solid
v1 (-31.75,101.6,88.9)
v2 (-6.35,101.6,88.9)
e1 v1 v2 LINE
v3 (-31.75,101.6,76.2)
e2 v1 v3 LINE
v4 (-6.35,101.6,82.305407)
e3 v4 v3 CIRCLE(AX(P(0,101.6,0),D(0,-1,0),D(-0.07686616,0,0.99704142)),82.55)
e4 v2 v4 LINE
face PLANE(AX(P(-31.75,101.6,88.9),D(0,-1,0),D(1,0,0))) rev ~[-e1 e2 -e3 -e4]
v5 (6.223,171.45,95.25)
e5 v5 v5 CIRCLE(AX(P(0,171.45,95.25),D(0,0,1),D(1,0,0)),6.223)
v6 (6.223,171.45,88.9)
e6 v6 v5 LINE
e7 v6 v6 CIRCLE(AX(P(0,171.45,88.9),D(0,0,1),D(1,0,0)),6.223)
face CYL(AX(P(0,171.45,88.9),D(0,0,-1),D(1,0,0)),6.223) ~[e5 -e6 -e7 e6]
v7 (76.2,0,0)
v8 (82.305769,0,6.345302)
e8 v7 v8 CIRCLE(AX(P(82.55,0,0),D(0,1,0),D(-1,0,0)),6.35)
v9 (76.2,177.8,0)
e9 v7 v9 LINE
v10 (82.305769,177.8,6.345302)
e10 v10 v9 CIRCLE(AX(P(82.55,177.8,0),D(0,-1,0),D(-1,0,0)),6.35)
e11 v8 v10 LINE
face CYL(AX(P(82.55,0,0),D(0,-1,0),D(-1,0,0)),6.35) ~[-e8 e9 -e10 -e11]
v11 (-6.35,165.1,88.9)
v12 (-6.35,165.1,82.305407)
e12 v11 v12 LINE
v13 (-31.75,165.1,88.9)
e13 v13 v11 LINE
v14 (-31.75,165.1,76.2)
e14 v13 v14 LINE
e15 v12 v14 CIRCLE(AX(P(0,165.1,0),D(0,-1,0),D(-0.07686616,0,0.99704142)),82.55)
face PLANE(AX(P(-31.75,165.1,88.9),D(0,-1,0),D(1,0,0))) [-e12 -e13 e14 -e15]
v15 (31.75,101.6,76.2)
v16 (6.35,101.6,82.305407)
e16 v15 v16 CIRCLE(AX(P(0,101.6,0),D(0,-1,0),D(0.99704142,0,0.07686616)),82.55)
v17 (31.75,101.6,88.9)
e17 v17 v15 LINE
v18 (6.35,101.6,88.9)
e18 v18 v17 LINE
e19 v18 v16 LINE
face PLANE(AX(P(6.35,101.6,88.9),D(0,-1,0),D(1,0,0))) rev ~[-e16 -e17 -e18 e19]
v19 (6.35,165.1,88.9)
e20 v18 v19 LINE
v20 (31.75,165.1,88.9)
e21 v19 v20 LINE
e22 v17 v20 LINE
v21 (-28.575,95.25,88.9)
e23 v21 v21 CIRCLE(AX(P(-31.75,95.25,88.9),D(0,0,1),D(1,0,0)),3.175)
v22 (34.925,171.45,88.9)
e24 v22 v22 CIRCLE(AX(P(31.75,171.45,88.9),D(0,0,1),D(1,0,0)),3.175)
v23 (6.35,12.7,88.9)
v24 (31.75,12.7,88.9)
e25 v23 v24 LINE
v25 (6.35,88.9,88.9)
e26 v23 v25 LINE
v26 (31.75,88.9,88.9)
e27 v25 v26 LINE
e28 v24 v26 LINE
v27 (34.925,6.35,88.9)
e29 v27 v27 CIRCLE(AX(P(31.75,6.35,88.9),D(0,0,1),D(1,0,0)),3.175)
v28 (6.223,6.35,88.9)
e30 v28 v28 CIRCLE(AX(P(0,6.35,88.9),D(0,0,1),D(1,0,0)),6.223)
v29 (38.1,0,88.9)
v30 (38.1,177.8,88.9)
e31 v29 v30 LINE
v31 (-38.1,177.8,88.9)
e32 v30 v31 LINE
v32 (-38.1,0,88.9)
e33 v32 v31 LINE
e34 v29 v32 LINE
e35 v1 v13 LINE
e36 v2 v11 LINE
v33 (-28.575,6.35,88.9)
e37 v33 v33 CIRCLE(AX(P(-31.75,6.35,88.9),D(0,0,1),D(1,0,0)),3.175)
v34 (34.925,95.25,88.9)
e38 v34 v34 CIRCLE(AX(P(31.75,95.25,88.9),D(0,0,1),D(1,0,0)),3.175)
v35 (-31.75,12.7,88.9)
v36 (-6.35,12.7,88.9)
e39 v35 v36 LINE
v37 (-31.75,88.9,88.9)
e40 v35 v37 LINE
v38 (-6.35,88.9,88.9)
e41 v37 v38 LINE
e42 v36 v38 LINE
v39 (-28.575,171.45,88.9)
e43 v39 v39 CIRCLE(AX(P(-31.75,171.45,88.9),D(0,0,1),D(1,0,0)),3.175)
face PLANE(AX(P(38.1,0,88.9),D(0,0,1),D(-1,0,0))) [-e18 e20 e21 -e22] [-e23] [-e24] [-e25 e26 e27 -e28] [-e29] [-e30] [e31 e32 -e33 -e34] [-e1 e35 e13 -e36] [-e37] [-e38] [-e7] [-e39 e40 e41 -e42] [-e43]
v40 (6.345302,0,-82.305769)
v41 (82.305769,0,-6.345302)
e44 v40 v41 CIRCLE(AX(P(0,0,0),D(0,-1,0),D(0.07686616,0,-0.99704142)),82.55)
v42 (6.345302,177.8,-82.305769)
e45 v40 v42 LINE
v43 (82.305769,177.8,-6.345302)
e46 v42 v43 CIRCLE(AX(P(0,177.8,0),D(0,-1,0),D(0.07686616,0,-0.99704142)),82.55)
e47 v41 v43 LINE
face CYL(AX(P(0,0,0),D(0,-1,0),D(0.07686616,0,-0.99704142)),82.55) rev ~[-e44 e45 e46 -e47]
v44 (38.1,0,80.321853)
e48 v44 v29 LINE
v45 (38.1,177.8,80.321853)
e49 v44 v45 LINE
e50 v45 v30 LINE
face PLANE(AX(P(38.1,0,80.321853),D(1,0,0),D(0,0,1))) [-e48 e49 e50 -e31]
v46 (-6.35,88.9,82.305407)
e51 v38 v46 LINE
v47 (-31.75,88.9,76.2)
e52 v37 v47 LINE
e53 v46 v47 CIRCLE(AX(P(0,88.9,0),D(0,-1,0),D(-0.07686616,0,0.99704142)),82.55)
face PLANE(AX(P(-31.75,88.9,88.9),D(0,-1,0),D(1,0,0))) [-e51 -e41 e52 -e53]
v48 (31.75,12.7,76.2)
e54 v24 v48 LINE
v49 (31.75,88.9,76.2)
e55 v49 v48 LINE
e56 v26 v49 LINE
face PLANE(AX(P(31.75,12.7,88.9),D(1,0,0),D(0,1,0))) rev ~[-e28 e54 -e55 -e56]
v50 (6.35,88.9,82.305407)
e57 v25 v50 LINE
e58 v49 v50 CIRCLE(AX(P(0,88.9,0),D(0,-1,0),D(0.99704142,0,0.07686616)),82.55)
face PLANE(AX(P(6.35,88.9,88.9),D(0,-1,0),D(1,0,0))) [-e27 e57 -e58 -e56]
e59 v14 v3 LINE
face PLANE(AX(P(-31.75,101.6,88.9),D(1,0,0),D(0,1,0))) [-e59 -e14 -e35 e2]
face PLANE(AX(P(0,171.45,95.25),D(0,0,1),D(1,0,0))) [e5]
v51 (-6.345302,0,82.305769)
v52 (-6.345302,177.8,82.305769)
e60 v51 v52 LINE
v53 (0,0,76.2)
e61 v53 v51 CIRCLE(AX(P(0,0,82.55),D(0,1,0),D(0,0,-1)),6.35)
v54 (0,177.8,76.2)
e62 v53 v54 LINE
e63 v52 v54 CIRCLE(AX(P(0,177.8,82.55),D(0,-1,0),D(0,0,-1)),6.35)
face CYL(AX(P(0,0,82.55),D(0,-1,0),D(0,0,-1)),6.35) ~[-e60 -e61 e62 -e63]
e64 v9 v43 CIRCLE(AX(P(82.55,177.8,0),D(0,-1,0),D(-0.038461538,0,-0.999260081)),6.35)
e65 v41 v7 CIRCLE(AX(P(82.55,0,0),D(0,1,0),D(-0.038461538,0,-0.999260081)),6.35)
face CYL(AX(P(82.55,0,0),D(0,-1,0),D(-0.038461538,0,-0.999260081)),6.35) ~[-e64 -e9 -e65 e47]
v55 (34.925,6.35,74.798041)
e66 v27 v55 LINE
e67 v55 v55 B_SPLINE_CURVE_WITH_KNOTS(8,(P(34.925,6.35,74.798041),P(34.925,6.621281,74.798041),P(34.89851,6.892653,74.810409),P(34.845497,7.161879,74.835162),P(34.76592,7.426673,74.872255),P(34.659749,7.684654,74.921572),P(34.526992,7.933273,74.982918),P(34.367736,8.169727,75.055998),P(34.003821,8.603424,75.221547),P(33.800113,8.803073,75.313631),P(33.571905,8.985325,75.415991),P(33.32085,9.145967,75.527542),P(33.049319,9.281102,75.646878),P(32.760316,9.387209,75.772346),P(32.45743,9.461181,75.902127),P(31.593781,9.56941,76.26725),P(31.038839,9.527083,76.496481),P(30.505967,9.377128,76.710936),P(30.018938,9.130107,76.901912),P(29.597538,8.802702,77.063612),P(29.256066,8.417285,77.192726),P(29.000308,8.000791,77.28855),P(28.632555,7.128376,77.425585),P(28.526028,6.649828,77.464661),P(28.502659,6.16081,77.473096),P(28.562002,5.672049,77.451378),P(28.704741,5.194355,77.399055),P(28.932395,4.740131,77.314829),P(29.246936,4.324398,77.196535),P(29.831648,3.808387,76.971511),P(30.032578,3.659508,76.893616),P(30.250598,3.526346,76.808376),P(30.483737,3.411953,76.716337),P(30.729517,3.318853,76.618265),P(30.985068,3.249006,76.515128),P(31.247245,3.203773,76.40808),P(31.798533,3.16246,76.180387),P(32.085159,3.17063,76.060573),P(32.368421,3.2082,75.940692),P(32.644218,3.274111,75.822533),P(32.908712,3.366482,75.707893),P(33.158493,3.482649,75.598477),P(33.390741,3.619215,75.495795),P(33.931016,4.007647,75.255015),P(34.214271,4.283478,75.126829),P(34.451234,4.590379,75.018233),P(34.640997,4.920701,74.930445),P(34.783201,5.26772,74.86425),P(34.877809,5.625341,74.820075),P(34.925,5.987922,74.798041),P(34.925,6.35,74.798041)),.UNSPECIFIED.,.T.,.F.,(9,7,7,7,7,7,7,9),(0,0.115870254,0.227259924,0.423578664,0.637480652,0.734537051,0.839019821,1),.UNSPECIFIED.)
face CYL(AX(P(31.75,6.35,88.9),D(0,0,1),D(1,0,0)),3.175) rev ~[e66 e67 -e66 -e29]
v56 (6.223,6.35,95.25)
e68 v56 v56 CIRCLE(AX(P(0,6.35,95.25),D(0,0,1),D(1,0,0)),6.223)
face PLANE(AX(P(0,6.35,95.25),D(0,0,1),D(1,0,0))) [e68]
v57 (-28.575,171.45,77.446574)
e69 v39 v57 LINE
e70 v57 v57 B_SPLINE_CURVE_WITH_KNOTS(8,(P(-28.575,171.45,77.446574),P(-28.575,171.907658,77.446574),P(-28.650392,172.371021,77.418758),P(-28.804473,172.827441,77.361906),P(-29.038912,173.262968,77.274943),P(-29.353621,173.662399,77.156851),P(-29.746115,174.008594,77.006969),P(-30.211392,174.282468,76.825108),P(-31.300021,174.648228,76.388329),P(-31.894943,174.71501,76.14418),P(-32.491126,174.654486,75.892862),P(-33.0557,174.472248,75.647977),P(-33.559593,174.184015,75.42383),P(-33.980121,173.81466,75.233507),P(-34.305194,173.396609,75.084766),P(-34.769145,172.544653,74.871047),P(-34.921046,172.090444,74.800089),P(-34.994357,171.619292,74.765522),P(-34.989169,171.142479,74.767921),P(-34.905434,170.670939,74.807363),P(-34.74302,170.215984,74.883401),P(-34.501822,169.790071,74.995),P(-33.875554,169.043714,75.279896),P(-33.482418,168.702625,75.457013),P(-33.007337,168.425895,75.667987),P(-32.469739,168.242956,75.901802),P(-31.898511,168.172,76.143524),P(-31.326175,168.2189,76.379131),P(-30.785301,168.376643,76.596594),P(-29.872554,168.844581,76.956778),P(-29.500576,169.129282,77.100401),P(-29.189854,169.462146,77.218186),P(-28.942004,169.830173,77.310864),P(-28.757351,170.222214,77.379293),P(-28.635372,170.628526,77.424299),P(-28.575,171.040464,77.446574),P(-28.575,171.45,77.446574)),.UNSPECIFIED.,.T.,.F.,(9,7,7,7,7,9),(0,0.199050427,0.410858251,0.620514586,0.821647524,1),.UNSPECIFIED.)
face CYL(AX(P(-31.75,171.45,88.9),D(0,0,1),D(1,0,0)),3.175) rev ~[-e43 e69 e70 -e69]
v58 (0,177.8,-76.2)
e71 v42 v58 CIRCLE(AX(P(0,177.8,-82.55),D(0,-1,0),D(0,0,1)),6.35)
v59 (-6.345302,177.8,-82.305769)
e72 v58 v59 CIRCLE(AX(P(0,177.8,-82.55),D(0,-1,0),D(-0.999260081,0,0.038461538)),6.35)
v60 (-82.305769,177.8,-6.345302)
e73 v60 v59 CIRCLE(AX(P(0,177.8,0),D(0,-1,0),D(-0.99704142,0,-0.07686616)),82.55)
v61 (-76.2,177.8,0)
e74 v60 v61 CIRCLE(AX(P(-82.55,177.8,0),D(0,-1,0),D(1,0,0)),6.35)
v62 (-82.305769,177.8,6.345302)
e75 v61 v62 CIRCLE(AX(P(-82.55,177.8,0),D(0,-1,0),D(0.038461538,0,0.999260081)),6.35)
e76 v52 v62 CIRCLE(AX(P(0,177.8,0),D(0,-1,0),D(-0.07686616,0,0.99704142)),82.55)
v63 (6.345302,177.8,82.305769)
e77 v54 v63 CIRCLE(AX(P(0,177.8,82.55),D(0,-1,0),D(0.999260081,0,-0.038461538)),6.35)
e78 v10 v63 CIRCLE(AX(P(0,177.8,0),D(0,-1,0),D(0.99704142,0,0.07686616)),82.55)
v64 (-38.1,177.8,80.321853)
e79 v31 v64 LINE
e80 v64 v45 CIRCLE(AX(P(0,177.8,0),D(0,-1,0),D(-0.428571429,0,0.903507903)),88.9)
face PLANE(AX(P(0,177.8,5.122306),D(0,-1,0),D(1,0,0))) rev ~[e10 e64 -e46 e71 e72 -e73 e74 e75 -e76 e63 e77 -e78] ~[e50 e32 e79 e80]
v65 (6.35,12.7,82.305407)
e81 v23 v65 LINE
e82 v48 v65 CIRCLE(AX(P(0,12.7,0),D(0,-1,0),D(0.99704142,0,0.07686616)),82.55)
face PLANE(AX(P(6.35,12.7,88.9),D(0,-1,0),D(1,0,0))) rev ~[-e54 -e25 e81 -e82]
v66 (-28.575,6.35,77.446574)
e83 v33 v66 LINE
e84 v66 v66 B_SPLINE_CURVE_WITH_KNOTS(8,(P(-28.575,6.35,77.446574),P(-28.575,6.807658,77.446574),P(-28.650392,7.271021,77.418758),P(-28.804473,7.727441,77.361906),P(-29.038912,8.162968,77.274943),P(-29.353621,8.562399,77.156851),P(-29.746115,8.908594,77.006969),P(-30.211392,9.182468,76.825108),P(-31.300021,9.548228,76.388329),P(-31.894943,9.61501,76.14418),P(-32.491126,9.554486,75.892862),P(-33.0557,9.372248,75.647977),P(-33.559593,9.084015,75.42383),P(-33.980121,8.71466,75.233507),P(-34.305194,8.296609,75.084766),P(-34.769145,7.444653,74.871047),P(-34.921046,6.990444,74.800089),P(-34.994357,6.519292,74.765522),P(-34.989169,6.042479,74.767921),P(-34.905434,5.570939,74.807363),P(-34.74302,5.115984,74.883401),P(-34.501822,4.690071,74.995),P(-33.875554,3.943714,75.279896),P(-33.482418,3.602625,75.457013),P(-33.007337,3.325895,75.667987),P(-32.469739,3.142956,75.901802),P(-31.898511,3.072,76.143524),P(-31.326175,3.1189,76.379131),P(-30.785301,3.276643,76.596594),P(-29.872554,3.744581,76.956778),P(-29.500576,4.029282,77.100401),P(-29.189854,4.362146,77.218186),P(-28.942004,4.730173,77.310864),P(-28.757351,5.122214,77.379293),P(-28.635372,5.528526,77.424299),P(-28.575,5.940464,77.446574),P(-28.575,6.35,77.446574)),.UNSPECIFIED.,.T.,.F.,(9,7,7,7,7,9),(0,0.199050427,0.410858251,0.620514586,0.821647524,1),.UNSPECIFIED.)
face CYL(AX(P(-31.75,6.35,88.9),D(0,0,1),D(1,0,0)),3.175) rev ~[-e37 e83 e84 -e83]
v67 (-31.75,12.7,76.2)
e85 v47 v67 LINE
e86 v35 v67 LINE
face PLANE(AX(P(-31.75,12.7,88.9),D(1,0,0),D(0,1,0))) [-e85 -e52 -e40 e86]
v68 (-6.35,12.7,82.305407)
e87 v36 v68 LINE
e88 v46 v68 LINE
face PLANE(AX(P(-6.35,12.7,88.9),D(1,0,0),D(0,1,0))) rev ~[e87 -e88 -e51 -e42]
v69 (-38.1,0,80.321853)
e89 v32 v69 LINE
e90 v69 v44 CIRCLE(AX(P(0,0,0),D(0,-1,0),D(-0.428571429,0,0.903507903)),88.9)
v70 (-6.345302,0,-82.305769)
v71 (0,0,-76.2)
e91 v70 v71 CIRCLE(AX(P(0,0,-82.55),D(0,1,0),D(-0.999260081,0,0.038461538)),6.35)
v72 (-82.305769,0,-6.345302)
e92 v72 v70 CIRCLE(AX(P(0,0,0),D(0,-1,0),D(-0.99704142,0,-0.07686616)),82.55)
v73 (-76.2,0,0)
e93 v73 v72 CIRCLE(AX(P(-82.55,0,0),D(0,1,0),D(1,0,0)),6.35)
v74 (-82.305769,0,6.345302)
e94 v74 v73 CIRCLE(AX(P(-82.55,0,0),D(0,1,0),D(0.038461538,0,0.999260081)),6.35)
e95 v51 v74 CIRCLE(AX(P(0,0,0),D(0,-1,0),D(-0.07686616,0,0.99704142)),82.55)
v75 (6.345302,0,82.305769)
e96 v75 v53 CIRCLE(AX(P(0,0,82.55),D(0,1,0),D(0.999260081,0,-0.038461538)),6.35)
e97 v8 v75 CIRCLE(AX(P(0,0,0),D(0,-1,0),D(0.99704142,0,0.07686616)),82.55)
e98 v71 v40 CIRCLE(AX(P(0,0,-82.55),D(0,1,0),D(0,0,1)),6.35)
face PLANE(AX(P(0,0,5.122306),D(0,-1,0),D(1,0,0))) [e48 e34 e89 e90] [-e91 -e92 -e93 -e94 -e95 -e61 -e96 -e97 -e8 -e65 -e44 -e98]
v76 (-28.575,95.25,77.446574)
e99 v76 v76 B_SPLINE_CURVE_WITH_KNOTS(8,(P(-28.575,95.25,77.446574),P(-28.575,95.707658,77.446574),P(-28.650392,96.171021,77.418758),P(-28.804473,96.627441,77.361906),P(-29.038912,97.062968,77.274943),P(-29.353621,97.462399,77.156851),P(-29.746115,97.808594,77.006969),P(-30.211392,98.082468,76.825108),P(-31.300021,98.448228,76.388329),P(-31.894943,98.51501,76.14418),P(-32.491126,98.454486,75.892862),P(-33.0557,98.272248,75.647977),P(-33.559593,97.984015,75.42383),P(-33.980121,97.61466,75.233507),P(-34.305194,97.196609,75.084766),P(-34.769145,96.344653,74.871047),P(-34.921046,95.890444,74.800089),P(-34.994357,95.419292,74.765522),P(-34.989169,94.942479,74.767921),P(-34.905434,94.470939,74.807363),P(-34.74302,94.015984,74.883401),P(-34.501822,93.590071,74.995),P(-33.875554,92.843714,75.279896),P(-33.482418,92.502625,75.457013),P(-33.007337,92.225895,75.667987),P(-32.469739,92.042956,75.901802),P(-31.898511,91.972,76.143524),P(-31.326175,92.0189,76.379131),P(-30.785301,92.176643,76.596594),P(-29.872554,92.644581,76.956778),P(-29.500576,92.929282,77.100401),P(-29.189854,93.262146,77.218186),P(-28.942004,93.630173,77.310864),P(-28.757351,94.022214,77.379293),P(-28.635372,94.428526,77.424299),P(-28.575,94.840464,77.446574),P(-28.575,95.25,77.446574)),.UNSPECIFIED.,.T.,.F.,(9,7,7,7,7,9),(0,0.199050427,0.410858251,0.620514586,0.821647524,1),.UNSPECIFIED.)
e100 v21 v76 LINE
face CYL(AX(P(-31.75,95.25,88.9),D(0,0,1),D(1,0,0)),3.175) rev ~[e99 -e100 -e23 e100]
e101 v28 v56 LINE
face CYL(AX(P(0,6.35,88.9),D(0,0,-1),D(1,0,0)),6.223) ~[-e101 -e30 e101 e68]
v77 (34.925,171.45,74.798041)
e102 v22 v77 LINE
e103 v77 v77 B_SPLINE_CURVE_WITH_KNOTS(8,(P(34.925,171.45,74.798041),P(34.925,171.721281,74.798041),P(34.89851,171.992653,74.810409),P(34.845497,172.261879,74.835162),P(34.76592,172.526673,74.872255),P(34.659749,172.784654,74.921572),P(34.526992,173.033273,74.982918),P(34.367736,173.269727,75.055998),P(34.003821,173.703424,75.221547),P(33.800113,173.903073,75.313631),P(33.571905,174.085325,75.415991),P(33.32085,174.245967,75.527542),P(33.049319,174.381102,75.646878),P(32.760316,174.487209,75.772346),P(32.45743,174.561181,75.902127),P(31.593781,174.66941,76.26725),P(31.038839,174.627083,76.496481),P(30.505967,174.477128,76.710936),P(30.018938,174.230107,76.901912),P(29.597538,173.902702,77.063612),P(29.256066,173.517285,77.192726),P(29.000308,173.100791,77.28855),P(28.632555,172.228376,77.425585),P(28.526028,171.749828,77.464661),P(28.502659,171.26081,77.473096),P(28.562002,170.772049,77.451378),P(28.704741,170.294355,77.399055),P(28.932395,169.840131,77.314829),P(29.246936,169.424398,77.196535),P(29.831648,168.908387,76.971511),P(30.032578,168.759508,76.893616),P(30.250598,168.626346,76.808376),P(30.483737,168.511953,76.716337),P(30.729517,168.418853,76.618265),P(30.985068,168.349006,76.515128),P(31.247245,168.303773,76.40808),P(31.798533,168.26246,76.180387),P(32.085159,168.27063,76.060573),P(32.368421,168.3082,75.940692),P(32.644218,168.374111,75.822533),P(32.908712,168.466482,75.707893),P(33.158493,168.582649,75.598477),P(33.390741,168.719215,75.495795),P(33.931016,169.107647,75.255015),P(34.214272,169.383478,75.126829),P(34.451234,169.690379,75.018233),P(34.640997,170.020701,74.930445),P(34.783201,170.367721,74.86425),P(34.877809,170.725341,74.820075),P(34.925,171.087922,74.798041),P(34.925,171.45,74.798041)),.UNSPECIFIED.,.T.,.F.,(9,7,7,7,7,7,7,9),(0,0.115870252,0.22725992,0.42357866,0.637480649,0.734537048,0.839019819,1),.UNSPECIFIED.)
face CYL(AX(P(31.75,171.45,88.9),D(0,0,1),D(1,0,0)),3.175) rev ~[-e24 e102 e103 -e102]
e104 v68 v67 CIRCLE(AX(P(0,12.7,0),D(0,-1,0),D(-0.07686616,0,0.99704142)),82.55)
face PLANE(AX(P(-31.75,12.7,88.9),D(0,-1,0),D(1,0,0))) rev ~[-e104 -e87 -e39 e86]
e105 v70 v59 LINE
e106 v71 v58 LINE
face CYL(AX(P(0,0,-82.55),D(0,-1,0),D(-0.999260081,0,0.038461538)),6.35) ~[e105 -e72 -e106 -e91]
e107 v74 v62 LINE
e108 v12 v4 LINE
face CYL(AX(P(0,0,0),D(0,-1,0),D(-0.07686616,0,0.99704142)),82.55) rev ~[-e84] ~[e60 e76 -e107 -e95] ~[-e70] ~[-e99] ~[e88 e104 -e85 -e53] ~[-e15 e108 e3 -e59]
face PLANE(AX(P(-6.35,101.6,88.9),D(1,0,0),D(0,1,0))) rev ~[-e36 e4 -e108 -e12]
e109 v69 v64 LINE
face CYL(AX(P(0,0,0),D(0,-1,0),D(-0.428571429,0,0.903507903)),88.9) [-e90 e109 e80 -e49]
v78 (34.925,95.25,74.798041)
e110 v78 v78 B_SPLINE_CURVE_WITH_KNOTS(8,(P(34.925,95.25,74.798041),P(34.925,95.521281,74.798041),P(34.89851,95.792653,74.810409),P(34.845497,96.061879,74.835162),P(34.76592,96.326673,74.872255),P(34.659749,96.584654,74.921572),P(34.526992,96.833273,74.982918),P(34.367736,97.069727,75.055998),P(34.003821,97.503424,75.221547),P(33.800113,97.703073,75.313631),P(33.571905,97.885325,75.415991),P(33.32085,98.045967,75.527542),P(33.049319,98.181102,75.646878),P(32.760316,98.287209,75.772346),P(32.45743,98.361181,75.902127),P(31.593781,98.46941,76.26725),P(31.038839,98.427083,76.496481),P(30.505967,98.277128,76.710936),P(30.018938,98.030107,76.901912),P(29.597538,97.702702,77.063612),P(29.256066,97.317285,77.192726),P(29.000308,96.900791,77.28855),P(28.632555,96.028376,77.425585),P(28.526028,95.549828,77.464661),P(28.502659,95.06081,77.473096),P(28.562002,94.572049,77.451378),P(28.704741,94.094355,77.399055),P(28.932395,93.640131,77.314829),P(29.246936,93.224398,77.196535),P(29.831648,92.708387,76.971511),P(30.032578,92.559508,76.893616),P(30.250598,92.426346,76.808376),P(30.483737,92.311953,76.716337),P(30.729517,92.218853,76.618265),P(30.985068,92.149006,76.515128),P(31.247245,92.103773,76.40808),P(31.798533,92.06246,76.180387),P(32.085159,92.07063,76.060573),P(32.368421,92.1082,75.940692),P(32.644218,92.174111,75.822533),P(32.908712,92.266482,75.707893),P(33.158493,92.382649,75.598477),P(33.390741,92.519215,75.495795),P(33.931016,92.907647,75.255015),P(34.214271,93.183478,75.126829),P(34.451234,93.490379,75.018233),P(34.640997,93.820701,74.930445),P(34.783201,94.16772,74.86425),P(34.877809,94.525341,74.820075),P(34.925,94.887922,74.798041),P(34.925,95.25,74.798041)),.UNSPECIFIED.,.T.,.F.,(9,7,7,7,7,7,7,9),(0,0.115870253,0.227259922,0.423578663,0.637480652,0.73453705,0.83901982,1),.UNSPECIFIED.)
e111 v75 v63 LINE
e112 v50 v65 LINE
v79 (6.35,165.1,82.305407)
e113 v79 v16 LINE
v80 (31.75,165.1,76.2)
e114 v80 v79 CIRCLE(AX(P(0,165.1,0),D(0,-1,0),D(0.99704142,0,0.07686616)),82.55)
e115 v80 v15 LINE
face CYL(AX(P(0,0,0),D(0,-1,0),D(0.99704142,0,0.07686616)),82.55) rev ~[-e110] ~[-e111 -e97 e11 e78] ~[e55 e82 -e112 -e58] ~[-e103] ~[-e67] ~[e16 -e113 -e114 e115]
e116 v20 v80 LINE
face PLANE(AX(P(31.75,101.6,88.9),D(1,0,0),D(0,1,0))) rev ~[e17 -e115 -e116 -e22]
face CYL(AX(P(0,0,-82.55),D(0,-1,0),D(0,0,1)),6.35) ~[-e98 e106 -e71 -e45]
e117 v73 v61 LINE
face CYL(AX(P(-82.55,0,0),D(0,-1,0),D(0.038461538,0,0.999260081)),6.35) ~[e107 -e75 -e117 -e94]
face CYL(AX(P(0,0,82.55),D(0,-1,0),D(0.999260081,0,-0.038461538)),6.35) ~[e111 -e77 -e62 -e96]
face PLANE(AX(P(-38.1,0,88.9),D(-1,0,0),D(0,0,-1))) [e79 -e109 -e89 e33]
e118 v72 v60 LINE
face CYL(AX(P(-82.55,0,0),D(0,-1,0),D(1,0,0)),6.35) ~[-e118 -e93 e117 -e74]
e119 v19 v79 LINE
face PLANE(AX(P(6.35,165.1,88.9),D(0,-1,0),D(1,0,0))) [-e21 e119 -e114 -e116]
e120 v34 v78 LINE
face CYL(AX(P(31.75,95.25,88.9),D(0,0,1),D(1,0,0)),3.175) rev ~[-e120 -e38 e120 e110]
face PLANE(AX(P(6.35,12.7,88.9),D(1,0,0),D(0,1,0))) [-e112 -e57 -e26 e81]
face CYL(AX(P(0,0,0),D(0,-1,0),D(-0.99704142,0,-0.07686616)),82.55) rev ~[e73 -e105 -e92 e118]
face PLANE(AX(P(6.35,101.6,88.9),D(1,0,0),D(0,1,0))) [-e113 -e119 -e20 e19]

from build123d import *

# Parameters (mm, degrees)
F1_DEPTH = 177.8
F4_DEPTH = 177.801
F5_W     = 25.4
F5_H     = 76.2
F5_H_2   = 63.5
F6_DEPTH = 25.4
F7_R     = 3.175
F8_DEPTH = 25.4
F7_R_2   = 6.223
F9_DEPTH = 6.35


# Not quite as in the source:
# - a feature names something its author has since deleted; it is built from what else it names


with BuildPart() as f1:
    # F0 (on Front) → F1 (new body)
    with BuildSketch(Plane.XZ):
        with BuildLine():
            ThreePointArc((-38.1, 80.3218525683), (-47.519048812, -75.1342132454), (88.9, 0))
            ThreePointArc((88.9, 0), (75.1342132454, 47.519048812), (38.1, 80.3218525683))
            ThreePointArc((38.1, 80.3218525683), (19.5268700344, 86.7289533354), (0, 88.9))
            ThreePointArc((0, 88.9), (-19.5268700344, 86.7289533354), (-38.1, 80.3218525683))
        make_face()
        with BuildLine():
            ThreePointArc((0, 88.9), (19.5268700344, 86.7289533354), (38.1, 80.3218525683))
            Line((38.1, 80.3218525683), (38.1, 88.9))
            Line((38.1, 88.9), (0, 88.9))
        make_face()
        with BuildLine():
            Line((-38.1, 88.9), (-38.1, 80.3218525683))
            ThreePointArc((-38.1, 80.3218525683), (-19.5268700344, 86.7289533354), (0, 88.9))
            Line((0, 88.9), (-38.1, 88.9))
        make_face()
    extrude(amount=-F1_DEPTH)

    # F3 (on face) → F4 (cut, through all)
    with BuildSketch(Plane.XZ):
        with BuildLine():
            Line((-76.2, 0), (0, 0))
            Line((0, 0), (0, 76.2))
            ThreePointArc((0, 76.2), (-4.4029328075, 77.974338005), (-6.3453015162, 82.3057692308))
            ThreePointArc((-6.3453015162, 82.3057692308), (-58.3716647869, 58.3716647869), (-82.3057692308, 6.3453015162))
            ThreePointArc((-82.3057692308, 6.3453015162), (-77.974338005, 4.4029328075), (-76.2, 0))
        make_face()
        with BuildLine():
            Line((0, -76.2), (0, 0))
            Line((0, 0), (-76.2, 0))
            ThreePointArc((-76.2, 0), (-77.974338005, -4.4029328075), (-82.3057692308, -6.3453015162))
            ThreePointArc((-82.3057692308, -6.3453015162), (-58.3716647869, -58.3716647869), (-6.3453015162, -82.3057692308))
            ThreePointArc((-6.3453015162, -82.3057692308), (-4.4029328075, -77.974338005), (0, -76.2))
        make_face()
        with BuildLine():
            Line((0, 76.2), (0, 0))
            Line((0, 0), (76.2, 0))
            ThreePointArc((76.2, 0), (77.974338005, 4.4029328075), (82.3057692308, 6.3453015162))
            ThreePointArc((82.3057692308, 6.3453015162), (58.3716647869, 58.3716647869), (6.3453015162, 82.3057692308))
            ThreePointArc((6.3453015162, 82.3057692308), (4.4029328075, 77.974338005), (0, 76.2))
        make_face()
        with BuildLine():
            Line((76.2, 0), (0, 0))
            Line((0, 0), (0, -76.2))
            ThreePointArc((0, -76.2), (4.4029328075, -77.974338005), (6.3453015162, -82.3057692308))
            ThreePointArc((6.3453015162, -82.3057692308), (58.3716647869, -58.3716647869), (82.3057692308, -6.3453015162))
            ThreePointArc((82.3057692308, -6.3453015162), (77.974338005, -4.4029328075), (76.2, 0))
        make_face()
    extrude(amount=-F4_DEPTH, mode=Mode.SUBTRACT)

    # F5 (on face) → F6 (cut)
    with BuildSketch(Plane.XY.offset(88.9)):
        with Locations((-19.05, 50.8)):
            Rectangle(F5_W, F5_H)
        with Locations((19.05, 50.8)):
            Rectangle(F5_W, F5_H)
        with Locations((19.05, 133.35)):
            Rectangle(F5_W, F5_H_2)
        with Locations((-19.05, 133.35)):
            Rectangle(F5_W, F5_H_2)
    extrude(amount=-F6_DEPTH, mode=Mode.SUBTRACT)

    # F7 (on face) → F8 (cut)
    with BuildSketch(Plane.XY.offset(88.9)):
        with Locations((-31.75, 95.25)):
            Circle(F7_R)
        with Locations((-31.75, 171.45)):
            Circle(F7_R)
        with Locations((31.75, 171.45)):
            Circle(F7_R)
        with Locations((31.75, 95.25)):
            Circle(F7_R)
        with Locations((31.75, 6.35)):
            Circle(F7_R)
        with Locations((-31.75, 6.35)):
            Circle(F7_R)
    extrude(amount=-F8_DEPTH, mode=Mode.SUBTRACT)

    # F7 (on face) → F9 (join)
    with BuildSketch(Plane.XY.offset(88.9)):
        with Locations((0, 171.45)):
            Circle(F7_R_2)
        with Locations((0, 6.35)):
            Circle(F7_R_2)
    extrude(amount=F9_DEPTH)


solid = f1.part
